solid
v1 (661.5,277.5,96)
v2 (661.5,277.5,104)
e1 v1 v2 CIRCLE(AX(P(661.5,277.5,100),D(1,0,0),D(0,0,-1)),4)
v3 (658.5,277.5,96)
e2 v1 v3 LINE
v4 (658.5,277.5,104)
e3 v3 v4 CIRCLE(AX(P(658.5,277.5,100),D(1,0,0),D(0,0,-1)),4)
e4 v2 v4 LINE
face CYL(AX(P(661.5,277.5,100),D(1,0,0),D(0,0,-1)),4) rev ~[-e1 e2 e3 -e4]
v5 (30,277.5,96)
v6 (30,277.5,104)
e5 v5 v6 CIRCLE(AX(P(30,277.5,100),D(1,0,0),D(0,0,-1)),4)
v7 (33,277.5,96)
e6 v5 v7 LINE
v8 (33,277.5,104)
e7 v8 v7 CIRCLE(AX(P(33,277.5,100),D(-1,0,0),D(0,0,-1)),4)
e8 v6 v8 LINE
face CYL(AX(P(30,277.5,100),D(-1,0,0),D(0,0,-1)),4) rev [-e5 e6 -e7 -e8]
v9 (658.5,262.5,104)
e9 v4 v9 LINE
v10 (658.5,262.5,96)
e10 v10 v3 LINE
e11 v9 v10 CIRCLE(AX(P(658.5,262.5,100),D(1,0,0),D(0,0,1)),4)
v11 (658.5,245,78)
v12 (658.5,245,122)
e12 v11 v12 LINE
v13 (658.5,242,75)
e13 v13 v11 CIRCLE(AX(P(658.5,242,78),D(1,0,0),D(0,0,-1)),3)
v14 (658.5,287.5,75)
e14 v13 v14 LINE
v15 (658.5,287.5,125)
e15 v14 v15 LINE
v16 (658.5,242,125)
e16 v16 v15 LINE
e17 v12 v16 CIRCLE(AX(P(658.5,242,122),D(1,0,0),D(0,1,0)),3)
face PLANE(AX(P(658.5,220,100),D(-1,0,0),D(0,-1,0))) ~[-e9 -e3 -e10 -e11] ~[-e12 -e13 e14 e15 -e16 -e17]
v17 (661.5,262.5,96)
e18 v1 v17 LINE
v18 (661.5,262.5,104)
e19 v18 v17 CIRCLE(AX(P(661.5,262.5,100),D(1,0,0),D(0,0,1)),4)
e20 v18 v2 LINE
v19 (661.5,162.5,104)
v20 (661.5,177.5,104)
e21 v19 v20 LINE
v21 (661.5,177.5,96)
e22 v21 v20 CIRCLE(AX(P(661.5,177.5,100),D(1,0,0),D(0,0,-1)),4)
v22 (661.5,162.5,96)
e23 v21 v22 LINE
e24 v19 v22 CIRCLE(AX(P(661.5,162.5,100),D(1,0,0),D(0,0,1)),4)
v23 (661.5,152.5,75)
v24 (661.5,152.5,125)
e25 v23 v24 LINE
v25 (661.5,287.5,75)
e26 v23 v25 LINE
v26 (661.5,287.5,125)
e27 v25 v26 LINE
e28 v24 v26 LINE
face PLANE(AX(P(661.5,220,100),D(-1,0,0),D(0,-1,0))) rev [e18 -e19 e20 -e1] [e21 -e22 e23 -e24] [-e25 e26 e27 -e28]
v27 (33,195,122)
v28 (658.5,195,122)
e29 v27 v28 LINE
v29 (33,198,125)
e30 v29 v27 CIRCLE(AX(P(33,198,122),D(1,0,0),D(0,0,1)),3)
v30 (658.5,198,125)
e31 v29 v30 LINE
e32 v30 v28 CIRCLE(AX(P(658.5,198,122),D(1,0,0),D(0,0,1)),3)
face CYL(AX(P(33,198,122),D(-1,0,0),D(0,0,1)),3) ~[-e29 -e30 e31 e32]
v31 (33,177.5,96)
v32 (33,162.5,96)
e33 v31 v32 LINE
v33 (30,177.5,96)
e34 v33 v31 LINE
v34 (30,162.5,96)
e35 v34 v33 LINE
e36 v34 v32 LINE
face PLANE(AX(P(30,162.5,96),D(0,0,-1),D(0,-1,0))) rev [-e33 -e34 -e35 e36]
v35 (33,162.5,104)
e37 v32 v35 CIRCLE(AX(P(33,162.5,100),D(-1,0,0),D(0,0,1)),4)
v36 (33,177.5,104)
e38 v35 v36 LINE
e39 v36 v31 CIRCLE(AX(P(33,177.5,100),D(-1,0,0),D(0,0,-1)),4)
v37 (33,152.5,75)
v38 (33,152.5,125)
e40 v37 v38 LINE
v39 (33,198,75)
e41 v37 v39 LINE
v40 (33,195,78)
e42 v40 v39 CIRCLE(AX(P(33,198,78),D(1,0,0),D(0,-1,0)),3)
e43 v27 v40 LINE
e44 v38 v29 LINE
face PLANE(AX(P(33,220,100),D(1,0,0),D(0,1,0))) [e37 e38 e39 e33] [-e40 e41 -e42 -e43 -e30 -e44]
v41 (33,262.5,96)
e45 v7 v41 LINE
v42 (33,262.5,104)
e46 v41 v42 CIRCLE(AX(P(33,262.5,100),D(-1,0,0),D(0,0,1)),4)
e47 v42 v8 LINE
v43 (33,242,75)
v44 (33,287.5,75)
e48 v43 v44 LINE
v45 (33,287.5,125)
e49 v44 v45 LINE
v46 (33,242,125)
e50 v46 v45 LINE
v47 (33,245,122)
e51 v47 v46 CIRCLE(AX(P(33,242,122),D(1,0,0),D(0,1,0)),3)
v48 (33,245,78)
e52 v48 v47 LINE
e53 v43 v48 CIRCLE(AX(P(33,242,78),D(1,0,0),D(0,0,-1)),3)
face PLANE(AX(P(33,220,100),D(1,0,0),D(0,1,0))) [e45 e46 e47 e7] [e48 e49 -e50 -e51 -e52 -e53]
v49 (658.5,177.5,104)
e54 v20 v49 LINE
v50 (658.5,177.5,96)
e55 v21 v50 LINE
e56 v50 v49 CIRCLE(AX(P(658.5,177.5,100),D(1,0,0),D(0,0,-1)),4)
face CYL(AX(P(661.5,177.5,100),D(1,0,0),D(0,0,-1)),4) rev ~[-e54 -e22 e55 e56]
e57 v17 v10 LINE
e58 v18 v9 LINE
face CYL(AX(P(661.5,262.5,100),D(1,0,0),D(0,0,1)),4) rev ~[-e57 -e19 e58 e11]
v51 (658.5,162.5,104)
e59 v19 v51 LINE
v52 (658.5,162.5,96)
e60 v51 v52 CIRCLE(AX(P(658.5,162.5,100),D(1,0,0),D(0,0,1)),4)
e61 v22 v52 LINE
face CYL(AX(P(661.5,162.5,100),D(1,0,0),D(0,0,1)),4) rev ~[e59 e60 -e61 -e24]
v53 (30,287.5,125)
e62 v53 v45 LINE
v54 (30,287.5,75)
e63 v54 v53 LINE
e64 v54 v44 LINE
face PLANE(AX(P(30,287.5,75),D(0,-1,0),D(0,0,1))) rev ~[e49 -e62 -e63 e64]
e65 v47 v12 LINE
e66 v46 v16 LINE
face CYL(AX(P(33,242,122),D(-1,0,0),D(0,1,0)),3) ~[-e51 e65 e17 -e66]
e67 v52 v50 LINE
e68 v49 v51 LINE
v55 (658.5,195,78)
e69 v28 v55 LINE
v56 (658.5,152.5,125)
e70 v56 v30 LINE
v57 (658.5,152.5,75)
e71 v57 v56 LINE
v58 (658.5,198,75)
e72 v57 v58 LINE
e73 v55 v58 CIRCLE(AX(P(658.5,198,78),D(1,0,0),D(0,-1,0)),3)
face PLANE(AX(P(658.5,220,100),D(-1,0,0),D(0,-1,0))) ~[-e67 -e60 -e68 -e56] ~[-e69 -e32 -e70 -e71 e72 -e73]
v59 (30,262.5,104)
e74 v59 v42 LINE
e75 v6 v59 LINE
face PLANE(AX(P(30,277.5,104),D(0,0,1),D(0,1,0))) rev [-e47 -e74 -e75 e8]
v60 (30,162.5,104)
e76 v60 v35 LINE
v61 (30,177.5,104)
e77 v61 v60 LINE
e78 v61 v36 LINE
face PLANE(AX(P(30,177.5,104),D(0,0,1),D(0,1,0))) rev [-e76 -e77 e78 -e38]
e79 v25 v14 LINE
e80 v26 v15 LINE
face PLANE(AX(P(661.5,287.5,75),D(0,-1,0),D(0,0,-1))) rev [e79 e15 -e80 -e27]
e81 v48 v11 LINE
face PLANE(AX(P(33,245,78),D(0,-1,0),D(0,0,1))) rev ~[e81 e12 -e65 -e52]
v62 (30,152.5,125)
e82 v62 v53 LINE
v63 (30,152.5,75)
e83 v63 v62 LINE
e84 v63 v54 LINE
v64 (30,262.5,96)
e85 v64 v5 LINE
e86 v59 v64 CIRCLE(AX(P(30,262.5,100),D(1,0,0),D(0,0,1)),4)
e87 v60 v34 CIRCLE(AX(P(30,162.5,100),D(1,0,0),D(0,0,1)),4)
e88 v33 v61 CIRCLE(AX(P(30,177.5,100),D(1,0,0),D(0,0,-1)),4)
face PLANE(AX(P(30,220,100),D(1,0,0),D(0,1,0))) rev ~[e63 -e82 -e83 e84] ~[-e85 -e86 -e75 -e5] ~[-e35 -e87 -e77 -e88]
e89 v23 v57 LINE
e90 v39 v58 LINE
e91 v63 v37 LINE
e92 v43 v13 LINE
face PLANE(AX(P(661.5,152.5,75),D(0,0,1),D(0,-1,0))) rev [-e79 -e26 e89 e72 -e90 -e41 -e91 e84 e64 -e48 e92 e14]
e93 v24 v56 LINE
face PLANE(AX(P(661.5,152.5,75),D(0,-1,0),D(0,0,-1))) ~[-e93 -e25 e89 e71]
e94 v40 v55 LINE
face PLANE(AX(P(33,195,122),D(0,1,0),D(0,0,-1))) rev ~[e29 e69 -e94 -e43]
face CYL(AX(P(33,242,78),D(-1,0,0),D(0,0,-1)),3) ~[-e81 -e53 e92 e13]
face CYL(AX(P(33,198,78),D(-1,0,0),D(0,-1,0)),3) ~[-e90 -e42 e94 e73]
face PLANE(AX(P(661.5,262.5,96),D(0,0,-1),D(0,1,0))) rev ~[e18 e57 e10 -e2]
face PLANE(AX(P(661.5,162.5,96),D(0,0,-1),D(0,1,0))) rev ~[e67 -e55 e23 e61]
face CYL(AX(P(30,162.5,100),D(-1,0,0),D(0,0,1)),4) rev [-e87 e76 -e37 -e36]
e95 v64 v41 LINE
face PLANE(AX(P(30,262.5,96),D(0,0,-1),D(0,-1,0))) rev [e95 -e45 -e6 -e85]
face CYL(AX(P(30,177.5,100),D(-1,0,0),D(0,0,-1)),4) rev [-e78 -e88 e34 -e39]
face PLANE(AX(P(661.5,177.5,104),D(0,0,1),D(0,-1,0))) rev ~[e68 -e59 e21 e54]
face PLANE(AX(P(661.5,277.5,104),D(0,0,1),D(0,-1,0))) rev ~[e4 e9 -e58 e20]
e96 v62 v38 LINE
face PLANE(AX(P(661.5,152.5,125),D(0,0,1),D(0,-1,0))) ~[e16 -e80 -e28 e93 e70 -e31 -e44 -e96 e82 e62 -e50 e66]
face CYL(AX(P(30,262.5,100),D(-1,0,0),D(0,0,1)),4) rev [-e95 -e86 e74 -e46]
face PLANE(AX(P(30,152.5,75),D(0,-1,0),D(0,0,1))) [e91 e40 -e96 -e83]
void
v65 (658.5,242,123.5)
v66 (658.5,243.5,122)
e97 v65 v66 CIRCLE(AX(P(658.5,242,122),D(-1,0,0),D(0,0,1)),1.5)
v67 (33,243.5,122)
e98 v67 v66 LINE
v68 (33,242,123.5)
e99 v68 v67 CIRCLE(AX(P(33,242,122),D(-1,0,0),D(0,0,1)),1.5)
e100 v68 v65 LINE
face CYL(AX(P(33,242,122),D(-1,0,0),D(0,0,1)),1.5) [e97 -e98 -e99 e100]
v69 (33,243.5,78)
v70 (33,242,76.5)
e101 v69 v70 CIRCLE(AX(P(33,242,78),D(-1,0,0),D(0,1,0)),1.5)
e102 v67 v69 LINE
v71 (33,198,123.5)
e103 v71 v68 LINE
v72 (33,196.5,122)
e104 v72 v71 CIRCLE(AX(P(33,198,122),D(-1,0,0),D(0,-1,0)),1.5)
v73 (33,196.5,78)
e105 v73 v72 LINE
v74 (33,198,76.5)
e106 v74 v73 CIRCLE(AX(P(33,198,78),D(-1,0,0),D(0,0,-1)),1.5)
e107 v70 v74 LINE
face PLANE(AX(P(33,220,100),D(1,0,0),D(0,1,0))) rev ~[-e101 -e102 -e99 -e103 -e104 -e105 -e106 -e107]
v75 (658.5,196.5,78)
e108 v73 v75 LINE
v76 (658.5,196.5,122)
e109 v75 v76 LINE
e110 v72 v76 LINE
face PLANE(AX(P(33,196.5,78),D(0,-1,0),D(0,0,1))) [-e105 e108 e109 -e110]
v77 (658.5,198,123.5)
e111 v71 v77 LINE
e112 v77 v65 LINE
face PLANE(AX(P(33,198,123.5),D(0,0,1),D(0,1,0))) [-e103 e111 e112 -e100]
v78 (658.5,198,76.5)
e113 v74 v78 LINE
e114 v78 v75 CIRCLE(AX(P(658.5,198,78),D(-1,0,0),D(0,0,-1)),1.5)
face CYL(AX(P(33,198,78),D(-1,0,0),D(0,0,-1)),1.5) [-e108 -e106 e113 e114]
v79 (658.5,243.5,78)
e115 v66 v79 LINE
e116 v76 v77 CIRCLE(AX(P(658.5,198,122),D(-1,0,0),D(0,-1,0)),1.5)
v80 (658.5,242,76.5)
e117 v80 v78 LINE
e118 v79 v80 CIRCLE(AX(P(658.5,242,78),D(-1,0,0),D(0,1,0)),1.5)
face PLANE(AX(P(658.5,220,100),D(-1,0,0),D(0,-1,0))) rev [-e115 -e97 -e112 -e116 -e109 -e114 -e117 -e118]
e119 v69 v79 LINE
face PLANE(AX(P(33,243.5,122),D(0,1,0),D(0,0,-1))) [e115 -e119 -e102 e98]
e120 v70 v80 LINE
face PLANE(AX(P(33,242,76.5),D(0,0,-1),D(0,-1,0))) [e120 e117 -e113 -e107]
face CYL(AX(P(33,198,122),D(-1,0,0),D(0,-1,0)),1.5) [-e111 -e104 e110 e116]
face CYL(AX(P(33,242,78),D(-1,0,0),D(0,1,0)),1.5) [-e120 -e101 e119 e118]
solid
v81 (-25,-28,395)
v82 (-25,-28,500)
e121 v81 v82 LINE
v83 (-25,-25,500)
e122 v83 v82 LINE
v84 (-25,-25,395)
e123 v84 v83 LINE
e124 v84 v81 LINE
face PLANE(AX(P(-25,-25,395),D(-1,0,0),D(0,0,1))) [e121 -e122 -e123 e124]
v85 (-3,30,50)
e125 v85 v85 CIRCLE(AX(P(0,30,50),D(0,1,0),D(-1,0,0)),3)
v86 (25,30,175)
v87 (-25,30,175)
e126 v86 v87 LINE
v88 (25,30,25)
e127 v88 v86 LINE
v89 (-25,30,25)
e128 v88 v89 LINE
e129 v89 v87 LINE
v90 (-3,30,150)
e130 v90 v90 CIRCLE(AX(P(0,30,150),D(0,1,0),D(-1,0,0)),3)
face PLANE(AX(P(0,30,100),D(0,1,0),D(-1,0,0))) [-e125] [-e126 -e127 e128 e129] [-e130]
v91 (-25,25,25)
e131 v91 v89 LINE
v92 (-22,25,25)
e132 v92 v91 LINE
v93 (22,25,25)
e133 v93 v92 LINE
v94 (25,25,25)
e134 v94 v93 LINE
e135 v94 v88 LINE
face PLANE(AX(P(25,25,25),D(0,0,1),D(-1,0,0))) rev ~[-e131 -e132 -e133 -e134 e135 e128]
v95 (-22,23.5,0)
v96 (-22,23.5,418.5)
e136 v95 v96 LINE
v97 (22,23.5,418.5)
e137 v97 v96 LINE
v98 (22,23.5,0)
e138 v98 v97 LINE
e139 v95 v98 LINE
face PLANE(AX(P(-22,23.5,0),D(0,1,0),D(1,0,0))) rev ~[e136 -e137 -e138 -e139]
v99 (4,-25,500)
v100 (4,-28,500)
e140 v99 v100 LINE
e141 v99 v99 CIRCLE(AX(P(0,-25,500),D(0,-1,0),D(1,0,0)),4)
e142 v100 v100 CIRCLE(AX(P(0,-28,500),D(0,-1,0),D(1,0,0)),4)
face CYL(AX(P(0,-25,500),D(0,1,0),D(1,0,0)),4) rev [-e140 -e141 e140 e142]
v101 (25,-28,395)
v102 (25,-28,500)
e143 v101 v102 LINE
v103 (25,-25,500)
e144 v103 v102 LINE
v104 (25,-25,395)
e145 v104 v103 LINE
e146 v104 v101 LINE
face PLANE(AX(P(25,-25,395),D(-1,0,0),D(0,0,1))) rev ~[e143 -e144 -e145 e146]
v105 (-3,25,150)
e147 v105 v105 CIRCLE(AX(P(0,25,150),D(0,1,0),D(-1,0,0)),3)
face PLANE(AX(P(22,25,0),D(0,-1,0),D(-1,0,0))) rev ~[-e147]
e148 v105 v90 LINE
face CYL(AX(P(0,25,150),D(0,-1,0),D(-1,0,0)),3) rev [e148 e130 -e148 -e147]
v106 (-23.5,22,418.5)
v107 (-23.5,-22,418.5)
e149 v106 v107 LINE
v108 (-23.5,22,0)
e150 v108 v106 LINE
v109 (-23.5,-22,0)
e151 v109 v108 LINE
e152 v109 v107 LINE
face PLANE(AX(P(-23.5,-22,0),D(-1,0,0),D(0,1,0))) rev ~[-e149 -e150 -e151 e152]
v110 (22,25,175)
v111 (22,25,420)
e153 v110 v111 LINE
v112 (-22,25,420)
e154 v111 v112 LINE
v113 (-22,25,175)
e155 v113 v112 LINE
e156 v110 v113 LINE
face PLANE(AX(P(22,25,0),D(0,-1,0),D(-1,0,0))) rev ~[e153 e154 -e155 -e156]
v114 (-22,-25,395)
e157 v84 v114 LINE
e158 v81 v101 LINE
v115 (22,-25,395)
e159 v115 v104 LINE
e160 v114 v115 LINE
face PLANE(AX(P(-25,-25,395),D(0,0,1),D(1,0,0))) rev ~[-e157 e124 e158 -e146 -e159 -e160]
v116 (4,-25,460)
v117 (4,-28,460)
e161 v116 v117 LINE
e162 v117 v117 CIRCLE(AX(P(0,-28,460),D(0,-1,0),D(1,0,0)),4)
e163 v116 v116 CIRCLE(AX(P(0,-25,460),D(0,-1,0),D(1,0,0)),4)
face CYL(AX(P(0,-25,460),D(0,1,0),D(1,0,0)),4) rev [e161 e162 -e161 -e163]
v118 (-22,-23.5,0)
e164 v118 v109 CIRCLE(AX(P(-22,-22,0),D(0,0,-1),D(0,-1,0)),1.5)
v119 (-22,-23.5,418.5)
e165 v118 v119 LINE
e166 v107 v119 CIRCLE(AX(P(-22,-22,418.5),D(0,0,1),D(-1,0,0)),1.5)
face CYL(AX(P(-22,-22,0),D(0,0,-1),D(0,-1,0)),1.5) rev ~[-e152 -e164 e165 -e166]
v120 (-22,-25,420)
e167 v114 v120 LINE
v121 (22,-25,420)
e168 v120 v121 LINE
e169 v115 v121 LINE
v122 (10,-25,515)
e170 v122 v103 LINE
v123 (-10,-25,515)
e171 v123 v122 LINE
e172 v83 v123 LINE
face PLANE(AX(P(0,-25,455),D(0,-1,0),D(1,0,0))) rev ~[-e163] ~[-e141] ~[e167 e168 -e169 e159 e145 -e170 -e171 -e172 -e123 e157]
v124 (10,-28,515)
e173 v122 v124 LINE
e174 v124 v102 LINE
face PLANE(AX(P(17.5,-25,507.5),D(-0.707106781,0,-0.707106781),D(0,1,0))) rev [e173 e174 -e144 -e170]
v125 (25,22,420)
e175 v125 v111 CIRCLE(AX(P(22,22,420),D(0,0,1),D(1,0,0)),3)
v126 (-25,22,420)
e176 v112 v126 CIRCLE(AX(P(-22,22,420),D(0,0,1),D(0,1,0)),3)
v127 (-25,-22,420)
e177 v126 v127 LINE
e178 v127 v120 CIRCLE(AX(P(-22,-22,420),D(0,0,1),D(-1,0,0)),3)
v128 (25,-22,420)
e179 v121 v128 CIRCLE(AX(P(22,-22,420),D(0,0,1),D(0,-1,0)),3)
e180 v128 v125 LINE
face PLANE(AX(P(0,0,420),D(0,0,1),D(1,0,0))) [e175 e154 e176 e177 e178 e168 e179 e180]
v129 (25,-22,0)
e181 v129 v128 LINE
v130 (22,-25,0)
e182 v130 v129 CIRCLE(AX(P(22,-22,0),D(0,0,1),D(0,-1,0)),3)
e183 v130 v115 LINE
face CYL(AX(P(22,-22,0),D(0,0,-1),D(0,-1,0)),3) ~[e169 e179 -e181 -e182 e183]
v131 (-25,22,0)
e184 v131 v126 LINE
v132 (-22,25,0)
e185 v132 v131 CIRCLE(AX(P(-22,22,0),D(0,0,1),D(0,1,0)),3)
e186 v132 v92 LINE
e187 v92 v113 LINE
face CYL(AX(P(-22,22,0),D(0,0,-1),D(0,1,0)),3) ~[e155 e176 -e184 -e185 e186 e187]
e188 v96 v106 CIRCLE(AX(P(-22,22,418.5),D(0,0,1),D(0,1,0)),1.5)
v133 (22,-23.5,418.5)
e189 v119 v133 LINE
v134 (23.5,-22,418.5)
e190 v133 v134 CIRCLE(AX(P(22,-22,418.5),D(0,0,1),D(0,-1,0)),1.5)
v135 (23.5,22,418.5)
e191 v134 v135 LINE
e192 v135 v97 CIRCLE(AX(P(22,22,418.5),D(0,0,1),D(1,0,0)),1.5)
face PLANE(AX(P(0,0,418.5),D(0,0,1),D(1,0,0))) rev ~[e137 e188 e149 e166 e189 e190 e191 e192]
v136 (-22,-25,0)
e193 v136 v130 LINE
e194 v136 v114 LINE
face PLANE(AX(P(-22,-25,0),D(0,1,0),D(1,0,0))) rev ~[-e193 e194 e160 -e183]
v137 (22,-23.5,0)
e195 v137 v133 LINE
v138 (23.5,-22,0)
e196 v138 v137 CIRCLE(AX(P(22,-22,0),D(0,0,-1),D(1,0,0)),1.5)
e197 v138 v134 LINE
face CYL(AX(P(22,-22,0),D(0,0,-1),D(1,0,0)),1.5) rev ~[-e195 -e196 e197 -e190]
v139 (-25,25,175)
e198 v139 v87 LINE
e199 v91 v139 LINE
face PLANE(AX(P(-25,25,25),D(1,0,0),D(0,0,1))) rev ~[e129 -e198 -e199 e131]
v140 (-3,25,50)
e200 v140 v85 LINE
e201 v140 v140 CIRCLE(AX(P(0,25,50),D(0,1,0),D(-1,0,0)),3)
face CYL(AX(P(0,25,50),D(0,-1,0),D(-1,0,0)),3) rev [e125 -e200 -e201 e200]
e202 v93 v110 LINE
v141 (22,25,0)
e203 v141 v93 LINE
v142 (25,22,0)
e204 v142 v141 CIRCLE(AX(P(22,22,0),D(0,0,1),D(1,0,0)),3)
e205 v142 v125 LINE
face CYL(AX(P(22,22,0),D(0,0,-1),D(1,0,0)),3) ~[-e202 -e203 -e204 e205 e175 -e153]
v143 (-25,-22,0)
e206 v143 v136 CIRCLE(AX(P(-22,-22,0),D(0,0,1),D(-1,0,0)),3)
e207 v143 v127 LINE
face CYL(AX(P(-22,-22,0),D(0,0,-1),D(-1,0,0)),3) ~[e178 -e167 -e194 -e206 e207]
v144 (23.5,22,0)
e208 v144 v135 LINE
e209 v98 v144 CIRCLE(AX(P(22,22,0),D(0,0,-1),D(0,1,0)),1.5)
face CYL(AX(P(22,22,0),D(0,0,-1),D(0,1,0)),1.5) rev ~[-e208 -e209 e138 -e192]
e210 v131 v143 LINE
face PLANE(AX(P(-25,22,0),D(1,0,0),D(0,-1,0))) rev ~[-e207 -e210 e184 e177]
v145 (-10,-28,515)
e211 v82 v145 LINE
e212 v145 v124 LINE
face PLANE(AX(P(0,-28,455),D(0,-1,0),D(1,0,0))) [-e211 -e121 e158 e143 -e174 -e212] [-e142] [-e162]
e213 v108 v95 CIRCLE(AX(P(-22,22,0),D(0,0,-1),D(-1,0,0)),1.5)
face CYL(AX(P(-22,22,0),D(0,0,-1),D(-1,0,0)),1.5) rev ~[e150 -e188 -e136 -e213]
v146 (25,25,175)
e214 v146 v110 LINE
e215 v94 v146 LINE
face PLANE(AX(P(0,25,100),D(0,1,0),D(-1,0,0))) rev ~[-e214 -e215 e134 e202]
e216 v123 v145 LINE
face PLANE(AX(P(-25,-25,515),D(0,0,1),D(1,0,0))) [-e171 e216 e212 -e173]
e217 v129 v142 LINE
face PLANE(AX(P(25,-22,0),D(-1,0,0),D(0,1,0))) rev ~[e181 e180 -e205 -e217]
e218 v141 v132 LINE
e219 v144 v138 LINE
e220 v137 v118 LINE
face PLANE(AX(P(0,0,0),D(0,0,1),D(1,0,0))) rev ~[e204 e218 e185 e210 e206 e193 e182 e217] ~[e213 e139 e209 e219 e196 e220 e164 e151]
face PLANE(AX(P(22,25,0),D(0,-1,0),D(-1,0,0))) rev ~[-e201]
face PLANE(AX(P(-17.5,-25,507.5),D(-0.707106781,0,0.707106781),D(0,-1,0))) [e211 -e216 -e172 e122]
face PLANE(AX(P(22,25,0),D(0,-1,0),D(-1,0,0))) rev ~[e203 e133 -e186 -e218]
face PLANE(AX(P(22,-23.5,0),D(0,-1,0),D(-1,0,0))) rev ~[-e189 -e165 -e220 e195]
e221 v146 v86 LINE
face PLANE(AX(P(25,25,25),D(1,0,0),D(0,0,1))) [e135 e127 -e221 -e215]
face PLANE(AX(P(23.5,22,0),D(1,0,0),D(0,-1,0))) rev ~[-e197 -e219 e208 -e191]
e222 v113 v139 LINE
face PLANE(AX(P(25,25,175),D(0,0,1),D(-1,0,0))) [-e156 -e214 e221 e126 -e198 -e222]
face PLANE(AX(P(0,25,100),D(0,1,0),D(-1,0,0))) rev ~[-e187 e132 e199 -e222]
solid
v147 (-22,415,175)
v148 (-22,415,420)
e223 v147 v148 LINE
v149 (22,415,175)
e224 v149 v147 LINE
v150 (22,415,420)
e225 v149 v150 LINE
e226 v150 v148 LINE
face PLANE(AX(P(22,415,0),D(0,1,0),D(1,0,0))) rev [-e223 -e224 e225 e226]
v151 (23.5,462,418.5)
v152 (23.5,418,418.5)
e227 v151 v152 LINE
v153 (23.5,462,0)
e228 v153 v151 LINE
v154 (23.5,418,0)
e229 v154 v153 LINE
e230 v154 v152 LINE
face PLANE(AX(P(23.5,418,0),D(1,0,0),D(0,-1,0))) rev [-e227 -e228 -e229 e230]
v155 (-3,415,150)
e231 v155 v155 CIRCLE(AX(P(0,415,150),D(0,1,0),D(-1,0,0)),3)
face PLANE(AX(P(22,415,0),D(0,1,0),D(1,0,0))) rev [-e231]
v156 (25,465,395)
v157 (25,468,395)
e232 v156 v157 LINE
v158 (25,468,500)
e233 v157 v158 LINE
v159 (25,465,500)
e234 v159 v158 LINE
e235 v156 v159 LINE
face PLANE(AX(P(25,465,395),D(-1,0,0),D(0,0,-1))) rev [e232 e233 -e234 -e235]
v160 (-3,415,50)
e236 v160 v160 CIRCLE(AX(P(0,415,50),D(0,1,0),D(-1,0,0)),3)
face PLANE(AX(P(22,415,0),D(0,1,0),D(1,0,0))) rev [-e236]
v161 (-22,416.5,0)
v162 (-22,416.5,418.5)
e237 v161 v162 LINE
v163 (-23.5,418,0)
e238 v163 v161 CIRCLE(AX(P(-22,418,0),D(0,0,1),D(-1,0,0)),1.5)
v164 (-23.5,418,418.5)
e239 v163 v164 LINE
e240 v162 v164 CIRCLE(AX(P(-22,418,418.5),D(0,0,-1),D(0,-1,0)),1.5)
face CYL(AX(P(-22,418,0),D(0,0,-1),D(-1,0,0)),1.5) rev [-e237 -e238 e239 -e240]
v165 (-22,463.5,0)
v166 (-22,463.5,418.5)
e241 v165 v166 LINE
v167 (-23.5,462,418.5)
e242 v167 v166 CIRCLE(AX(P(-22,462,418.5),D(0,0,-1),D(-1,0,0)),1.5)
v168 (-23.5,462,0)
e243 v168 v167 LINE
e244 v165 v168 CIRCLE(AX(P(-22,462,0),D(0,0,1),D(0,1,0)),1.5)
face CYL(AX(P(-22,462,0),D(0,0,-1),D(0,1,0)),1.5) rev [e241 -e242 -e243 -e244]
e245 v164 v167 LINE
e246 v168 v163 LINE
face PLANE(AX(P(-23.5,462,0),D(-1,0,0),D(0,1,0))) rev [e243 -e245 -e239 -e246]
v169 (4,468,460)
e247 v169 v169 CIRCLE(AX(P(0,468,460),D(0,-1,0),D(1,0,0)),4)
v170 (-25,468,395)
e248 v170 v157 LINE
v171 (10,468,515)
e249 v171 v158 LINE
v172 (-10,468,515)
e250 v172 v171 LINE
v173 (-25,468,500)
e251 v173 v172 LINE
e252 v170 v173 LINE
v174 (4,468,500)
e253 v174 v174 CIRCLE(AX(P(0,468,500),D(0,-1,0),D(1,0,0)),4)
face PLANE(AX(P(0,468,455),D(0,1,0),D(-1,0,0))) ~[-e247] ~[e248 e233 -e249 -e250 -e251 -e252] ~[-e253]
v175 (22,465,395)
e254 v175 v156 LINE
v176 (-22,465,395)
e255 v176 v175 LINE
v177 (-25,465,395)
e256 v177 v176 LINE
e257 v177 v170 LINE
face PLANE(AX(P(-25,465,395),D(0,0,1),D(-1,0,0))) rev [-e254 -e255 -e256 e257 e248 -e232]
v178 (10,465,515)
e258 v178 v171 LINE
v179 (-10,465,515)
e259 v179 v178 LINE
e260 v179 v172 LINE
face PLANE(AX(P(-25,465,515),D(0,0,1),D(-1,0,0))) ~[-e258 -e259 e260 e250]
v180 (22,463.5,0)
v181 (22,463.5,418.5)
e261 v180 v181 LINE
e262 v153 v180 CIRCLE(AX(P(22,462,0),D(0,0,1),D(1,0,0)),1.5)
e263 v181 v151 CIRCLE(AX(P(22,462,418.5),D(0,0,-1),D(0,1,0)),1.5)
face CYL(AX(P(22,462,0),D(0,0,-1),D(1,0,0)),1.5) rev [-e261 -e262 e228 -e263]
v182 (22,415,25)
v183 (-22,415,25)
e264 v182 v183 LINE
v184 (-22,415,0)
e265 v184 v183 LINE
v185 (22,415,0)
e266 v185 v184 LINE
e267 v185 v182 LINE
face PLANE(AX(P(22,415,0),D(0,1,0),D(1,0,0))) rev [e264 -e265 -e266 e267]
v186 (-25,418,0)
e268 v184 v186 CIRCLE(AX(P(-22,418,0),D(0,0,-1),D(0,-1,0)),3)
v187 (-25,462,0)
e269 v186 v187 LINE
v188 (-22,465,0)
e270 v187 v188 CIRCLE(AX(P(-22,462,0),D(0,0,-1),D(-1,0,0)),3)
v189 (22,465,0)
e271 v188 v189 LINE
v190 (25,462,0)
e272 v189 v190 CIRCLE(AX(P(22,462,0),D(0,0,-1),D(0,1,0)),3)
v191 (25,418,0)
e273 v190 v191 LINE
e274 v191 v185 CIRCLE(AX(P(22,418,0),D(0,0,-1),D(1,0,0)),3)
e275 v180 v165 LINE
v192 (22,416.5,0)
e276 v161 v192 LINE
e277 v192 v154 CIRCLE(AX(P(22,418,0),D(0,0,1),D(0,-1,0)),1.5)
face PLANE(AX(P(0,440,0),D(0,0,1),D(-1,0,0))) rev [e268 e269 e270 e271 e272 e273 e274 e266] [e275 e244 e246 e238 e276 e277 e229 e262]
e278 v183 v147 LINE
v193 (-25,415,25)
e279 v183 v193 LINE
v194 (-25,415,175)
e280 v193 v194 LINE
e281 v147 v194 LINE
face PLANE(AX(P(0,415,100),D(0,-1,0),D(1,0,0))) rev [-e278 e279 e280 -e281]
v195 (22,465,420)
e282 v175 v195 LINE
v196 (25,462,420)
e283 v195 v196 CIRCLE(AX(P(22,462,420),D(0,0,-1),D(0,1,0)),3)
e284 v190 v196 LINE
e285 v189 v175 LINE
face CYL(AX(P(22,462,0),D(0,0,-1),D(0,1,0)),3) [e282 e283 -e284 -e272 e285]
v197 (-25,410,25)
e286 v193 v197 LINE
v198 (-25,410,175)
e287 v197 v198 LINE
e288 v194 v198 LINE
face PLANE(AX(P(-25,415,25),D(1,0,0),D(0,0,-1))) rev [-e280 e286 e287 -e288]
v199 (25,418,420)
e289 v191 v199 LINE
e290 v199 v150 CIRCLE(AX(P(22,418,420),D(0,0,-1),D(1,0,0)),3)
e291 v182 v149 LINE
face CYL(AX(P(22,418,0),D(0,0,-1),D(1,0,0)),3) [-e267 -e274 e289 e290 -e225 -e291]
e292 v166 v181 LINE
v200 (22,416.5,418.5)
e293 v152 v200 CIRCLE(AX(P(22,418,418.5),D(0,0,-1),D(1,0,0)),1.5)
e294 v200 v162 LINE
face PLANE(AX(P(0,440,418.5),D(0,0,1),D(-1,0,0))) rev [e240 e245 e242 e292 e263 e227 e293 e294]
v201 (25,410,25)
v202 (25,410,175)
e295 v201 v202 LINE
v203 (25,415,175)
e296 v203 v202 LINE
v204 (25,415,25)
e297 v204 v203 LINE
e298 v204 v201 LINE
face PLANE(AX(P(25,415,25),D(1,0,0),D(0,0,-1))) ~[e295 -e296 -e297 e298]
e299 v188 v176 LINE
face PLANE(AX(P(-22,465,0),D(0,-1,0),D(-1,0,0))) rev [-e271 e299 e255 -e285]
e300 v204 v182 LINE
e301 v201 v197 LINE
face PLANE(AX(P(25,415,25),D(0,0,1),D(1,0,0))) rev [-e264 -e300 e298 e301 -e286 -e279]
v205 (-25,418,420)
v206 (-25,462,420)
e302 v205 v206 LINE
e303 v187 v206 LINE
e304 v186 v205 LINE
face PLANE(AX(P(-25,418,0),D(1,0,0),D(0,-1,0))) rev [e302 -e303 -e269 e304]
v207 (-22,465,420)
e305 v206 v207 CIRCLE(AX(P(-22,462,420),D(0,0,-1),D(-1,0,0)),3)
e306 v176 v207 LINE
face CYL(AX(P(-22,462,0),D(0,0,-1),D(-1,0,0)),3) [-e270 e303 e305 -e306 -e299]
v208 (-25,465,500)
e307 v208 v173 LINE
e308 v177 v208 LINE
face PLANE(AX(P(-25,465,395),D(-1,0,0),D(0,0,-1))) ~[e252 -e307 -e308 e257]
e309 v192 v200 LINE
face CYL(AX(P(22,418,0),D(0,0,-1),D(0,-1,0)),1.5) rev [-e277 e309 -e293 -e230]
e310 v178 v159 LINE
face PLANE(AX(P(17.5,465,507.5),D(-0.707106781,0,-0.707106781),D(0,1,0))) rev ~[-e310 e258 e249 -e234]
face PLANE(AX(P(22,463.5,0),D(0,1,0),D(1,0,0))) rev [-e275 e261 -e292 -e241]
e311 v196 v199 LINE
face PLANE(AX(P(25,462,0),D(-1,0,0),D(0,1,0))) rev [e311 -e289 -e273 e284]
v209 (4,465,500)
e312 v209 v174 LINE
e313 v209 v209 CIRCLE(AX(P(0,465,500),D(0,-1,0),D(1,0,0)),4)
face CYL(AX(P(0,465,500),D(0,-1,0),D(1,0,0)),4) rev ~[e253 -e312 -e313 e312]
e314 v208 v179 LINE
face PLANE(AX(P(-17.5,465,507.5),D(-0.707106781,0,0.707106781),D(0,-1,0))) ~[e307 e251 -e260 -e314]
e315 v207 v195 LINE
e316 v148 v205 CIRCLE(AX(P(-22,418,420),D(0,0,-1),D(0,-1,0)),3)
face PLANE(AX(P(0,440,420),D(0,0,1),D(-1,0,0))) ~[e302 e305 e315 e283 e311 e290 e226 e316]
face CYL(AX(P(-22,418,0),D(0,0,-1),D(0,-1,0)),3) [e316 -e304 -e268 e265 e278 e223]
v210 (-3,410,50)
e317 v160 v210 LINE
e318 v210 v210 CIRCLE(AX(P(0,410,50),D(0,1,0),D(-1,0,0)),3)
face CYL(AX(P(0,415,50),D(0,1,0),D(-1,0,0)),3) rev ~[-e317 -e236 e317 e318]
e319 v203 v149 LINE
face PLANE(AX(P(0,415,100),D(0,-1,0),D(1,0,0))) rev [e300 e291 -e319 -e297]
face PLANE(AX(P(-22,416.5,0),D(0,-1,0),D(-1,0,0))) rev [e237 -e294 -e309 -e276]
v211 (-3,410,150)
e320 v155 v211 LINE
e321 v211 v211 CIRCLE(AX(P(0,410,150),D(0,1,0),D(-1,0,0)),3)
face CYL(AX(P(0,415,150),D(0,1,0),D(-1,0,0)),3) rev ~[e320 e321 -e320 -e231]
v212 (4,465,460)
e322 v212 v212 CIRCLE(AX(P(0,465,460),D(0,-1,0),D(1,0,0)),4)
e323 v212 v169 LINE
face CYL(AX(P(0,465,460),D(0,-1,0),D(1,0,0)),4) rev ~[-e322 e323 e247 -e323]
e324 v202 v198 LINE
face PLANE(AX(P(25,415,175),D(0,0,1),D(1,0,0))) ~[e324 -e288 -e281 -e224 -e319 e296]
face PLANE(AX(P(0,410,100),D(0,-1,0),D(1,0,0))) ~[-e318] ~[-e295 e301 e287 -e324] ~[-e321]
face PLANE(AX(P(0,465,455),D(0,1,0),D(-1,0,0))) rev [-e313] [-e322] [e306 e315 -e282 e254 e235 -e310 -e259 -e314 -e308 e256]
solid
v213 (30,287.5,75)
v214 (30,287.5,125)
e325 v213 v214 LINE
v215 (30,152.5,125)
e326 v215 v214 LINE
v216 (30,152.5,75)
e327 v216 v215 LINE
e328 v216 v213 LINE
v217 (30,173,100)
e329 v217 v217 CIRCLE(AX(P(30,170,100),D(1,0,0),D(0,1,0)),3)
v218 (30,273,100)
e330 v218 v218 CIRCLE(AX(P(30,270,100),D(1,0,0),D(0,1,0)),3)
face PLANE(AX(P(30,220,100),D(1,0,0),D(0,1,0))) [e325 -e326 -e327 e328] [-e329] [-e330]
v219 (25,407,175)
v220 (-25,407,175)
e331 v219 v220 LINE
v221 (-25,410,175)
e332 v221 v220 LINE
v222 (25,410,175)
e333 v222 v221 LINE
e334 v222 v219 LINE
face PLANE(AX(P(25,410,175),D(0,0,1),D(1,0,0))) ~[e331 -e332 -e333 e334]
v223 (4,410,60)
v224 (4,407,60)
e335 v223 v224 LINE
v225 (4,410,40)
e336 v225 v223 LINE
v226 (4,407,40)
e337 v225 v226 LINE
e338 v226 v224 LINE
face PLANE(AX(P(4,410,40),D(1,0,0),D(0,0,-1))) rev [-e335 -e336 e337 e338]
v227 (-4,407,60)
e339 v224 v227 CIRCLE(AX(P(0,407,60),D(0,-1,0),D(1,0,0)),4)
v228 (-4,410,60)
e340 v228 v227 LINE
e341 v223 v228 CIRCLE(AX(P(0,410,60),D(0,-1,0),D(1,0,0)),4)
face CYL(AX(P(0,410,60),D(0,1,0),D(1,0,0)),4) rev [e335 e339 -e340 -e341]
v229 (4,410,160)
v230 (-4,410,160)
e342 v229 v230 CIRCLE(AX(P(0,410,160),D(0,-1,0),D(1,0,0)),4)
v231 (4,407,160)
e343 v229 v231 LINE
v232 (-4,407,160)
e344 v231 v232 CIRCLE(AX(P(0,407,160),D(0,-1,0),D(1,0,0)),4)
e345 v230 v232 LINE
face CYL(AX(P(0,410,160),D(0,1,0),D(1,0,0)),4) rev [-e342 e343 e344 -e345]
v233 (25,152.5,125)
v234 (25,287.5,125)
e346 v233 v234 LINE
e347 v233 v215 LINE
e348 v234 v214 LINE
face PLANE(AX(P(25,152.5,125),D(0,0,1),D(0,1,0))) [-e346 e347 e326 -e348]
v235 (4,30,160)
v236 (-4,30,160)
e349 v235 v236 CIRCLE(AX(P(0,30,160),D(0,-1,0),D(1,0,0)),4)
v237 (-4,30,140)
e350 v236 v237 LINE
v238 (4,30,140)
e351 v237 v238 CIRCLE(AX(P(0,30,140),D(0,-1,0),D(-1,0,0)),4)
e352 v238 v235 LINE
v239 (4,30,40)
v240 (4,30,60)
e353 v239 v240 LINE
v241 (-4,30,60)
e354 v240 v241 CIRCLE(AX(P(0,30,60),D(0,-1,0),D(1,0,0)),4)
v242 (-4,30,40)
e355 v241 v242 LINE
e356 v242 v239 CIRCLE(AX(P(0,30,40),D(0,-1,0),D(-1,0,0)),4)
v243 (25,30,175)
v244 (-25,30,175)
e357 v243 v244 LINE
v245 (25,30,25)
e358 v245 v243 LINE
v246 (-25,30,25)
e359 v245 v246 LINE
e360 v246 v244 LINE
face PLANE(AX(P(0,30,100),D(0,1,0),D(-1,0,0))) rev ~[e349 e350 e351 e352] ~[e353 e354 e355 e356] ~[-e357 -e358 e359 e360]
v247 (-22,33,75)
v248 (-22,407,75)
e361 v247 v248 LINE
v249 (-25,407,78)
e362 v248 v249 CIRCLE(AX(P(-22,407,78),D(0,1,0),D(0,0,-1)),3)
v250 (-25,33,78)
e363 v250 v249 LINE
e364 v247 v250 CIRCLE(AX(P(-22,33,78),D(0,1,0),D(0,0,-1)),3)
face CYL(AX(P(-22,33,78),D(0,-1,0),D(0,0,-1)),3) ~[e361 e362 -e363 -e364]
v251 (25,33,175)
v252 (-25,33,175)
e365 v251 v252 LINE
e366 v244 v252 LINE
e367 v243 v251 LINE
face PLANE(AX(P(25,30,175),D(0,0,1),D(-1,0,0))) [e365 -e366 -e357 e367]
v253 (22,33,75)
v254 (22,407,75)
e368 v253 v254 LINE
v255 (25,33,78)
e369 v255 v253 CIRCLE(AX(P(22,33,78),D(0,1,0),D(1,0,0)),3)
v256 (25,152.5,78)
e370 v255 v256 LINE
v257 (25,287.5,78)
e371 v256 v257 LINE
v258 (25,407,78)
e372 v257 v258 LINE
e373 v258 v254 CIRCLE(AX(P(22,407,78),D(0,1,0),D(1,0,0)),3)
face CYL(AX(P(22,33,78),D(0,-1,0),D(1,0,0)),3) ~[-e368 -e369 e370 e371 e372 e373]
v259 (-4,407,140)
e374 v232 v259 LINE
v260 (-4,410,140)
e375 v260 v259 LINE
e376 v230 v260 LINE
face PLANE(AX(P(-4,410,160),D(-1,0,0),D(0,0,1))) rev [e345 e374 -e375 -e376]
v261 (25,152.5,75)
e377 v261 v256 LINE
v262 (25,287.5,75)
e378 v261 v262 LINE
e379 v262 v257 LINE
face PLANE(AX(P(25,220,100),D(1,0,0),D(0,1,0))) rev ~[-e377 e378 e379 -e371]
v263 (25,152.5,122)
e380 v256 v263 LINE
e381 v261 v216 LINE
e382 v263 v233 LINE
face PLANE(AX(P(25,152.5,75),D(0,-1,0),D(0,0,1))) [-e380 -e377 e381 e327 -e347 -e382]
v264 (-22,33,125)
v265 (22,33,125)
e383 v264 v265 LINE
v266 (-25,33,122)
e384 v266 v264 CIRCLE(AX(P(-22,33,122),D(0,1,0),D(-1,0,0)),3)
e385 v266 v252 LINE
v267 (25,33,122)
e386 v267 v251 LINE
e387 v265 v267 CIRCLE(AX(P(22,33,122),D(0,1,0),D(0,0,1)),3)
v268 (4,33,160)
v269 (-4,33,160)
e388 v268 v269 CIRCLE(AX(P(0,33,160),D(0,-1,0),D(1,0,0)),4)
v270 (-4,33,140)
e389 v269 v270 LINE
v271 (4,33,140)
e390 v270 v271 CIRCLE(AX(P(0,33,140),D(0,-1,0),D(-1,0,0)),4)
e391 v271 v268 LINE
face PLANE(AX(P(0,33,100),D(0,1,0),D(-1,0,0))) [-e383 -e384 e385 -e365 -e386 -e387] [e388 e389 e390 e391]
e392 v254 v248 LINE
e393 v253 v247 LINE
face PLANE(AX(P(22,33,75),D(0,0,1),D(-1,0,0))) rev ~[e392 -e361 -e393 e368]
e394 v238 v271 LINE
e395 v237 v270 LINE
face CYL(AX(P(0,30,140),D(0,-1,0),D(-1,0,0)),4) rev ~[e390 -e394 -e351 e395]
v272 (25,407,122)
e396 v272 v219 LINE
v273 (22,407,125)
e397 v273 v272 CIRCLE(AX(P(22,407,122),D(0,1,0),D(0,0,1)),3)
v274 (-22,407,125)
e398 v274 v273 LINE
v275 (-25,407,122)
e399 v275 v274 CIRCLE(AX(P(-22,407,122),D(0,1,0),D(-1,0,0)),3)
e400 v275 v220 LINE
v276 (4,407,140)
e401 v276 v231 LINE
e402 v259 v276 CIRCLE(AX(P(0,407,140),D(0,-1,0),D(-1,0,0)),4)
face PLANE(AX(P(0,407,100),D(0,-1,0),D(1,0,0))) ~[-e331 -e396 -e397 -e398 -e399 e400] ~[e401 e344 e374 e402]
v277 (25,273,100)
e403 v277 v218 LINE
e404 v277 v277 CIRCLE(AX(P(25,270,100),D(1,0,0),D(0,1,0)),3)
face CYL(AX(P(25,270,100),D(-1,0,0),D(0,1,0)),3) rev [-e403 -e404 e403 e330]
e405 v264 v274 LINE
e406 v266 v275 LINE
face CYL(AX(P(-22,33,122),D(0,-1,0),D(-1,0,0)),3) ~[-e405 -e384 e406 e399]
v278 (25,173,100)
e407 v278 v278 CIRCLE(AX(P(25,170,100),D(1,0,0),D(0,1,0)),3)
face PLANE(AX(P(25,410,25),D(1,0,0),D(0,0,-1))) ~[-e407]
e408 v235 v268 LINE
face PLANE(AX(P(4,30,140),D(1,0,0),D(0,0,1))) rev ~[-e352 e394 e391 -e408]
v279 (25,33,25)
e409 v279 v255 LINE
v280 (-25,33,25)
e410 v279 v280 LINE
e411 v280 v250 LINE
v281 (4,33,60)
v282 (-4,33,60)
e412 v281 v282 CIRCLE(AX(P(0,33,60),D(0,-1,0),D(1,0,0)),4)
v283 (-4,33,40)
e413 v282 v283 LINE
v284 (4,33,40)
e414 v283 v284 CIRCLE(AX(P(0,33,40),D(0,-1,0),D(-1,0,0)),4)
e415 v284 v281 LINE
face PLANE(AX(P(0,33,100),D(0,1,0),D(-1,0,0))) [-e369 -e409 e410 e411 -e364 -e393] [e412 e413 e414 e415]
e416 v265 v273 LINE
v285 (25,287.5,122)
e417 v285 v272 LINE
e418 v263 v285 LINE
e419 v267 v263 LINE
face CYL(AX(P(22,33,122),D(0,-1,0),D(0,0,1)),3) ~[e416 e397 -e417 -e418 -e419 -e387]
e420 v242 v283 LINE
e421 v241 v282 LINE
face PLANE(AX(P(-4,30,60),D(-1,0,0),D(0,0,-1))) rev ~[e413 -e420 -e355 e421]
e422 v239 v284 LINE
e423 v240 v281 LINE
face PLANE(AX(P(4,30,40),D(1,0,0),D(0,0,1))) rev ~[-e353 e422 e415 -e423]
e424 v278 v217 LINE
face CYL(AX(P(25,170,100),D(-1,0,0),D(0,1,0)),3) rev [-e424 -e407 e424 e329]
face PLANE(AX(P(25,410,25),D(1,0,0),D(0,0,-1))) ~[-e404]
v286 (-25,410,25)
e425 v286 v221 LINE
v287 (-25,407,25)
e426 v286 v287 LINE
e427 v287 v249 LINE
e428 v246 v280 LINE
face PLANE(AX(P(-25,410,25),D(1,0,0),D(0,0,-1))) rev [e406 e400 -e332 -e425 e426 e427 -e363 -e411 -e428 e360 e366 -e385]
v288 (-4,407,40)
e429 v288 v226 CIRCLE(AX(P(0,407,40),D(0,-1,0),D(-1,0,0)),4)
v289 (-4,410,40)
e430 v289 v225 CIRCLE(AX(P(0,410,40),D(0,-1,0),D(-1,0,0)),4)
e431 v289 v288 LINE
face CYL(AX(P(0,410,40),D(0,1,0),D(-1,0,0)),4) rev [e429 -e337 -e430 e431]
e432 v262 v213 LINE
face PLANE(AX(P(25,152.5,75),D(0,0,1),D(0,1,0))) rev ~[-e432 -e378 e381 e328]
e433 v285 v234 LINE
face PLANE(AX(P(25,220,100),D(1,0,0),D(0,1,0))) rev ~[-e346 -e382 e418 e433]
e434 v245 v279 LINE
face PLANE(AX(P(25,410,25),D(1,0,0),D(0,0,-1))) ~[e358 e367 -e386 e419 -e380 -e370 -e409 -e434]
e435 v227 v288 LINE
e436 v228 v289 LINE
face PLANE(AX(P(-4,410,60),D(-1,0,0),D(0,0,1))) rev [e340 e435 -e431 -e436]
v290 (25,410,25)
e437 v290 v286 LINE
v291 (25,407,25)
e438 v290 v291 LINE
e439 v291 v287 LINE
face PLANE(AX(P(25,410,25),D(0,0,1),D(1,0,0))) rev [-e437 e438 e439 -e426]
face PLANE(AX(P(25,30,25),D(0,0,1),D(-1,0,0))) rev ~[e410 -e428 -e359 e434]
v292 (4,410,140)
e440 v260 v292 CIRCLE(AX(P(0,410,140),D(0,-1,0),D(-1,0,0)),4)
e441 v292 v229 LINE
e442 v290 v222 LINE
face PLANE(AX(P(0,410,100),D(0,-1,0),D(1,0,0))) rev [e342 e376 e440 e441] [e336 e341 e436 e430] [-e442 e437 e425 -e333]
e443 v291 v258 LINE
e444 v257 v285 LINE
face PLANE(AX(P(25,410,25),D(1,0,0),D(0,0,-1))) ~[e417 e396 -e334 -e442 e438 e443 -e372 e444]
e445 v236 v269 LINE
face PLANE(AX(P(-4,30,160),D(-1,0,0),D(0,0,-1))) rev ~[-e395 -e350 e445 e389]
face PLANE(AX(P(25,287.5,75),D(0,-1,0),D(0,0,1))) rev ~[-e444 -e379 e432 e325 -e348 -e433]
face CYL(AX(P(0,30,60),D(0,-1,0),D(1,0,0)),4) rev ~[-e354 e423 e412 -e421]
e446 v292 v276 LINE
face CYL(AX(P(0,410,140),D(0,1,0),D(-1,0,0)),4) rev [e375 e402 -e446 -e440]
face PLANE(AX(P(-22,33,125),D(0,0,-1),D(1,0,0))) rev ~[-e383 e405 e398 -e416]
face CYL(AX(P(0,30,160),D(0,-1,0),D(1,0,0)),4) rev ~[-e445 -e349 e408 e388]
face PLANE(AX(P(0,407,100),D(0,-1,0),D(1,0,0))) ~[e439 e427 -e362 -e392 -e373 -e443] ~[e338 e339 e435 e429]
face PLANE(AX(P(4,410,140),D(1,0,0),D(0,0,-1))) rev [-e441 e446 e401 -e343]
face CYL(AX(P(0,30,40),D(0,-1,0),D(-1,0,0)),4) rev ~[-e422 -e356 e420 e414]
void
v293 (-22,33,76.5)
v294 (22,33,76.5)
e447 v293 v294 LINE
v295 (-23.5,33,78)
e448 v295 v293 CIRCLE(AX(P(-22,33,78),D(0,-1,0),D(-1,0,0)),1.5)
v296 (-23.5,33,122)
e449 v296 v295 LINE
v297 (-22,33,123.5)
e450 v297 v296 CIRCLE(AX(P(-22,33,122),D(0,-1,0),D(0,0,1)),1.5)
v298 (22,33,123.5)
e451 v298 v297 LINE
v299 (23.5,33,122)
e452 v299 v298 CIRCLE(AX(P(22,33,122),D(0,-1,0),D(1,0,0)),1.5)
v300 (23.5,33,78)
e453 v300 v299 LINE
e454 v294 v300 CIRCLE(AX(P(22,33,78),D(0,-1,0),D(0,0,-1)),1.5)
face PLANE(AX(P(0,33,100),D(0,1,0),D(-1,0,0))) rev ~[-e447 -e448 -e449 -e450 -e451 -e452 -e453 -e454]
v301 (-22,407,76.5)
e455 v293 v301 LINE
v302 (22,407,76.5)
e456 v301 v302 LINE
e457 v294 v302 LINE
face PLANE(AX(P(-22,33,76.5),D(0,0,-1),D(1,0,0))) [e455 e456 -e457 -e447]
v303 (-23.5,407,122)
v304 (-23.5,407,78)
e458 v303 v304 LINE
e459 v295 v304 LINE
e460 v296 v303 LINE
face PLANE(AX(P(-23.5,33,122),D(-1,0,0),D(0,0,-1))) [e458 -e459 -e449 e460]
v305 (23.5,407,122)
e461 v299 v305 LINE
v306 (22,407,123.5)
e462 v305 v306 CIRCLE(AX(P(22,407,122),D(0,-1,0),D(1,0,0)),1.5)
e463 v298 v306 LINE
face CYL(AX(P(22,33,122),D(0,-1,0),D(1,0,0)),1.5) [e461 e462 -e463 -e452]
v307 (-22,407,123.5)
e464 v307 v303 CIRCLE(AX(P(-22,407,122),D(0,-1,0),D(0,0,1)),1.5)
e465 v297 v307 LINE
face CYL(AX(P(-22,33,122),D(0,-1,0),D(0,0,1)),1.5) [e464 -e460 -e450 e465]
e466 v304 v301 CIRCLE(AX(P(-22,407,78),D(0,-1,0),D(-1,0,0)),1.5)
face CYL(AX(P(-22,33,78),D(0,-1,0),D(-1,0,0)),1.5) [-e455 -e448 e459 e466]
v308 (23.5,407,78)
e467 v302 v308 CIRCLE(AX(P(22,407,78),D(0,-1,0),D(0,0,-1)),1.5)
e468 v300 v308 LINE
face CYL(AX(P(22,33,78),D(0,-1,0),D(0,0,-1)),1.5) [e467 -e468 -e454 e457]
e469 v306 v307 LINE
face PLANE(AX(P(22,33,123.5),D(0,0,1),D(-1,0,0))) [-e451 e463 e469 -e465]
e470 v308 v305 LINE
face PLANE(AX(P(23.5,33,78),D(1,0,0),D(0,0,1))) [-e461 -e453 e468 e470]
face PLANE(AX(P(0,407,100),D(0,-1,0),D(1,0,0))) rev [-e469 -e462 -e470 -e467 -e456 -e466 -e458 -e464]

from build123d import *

# Parameters (mm, degrees)
F1_DEPTH  = 420
F2_W      = 50
F2_H      = 150
F2_R      = 3
F3_DEPTH  = 5
F5_DEPTH  = 1.5
F6_W      = 50
F6_H      = 120
F6_R      = 4
F7_DEPTH  = 3
F8_SIZE   = 15
F11_W     = 50
F11_H     = 150
F12_DEPTH = 3
F15_DEPTH = 374
F17_W     = 135
F17_H     = 50
F17_R     = 3
F18_DEPTH = 5
F19_W     = 135
F19_H     = 50
F19_R     = 4
F20_DEPTH = 3
F23_DEPTH = 625.5
F25_DEPTH = 3.001


# Not quite as in the source:
# - a pattern or mirror of a feature is missing from the dataset's text; its kind, count and spacing are read off the source's solid


with BuildPart() as f1:
    # F0 (on Top) → F1 (new body)
    with BuildSketch(Plane.XY):
        with BuildLine():
            Line((-22, -25), (22, -25))
            ThreePointArc((22, -25), (24.1213203436, -24.1213203436), (25, -22))
            Line((25, -22), (25, 22))
            ThreePointArc((25, 22), (24.1213203436, 24.1213203436), (22, 25))
            Line((22, 25), (-22, 25))
            ThreePointArc((-22, 25), (-24.1213203436, 24.1213203436), (-25, 22))
            Line((-25, 22), (-25, -22))
            ThreePointArc((-25, -22), (-24.1213203436, -24.1213203436), (-22, -25))
        make_face()
        with BuildLine():
            ThreePointArc((22, 23.5), (23.0606601718, 23.0606601718), (23.5, 22))
            Line((23.5, 22), (23.5, -22))
            ThreePointArc((23.5, -22), (23.0606601718, -23.0606601718), (22, -23.5))
            Line((22, -23.5), (-22, -23.5))
            ThreePointArc((-22, -23.5), (-23.0606601718, -23.0606601718), (-23.5, -22))
            Line((-23.5, -22), (-23.5, 22))
            ThreePointArc((-23.5, 22), (-23.0606601718, 23.0606601718), (-22, 23.5))
            Line((-22, 23.5), (22, 23.5))
        make_face(mode=Mode.SUBTRACT)
    extrude(amount=F1_DEPTH)

    # F2 (on face) → F3 (join)
    with BuildSketch(Plane(origin=(0, 25, 0), x_dir=(-1, 0, 0), z_dir=(0, 1, 0))):
        with Locations((0, 100)):
            Rectangle(F2_W, F2_H)
        with Locations((0, 50)):
            Circle(F2_R, mode=Mode.SUBTRACT)
        with Locations((0, 150)):
            Circle(F2_R, mode=Mode.SUBTRACT)
    extrude(amount=F3_DEPTH)

    # F4 (on face) → F5 (join)
    with BuildSketch(Plane.XY.offset(420)):
        with BuildLine():
            ThreePointArc((23.5, 22), (23.0606601718, 23.0606601718), (22, 23.5))
            Line((22, 23.5), (-22, 23.5))
            ThreePointArc((-22, 23.5), (-23.0606601718, 23.0606601718), (-23.5, 22))
            Line((-23.5, 22), (-23.5, -22))
            ThreePointArc((-23.5, -22), (-23.0606601718, -23.0606601718), (-22, -23.5))
            Line((-22, -23.5), (22, -23.5))
            ThreePointArc((22, -23.5), (23.0606601718, -23.0606601718), (23.5, -22))
            Line((23.5, -22), (23.5, 22))
        make_face()
    extrude(amount=-F5_DEPTH)

    # F6 (on face) → F7 (join)
    with BuildSketch(Plane.XZ.offset(25)):
        with Locations((0, 455)):
            Rectangle(F6_W, F6_H)
        with Locations((0, 460)):
            Circle(F6_R, mode=Mode.SUBTRACT)
        with Locations((0, 500)):
            Circle(F6_R, mode=Mode.SUBTRACT)
    extrude(amount=F7_DEPTH)

    # F8
    f8_edges = [f1.edges().sort_by_distance(p)[0] for p in [
        (25, -26.5, 515),
        (-25, -26.5, 515),
    ]]
    chamfer(f8_edges, length=F8_SIZE)


with BuildPart() as f10_1:
    # F10: instance of F1
    add(f1.part.mirror(Plane(origin=(0, 220, 463.1674453561), x_dir=(1, 0, 0), z_dir=(0, 1, 0))))


with BuildPart() as f12:
    # F11 (on face) → F12 (new body)
    with BuildSketch(Plane(origin=(0, 30, 0), x_dir=(-1, 0, 0), z_dir=(0, 1, 0))):
        with Locations((0, 100)):
            Rectangle(F11_W, F11_H)
        with BuildLine():
            Line((-4, 40), (-4, 60))
            ThreePointArc((-4, 60), (0, 64), (4, 60))
            Line((4, 60), (4, 40))
            ThreePointArc((4, 40), (0, 36), (-4, 40))
        make_face(mode=Mode.SUBTRACT)
        with BuildLine():
            Line((4, 160), (4, 140))
            ThreePointArc((4, 140), (0, 136), (-4, 140))
            Line((-4, 140), (-4, 160))
            ThreePointArc((-4, 160), (0, 164), (4, 160))
        make_face(mode=Mode.SUBTRACT)
    extrude(amount=F12_DEPTH)


with BuildPart() as f13_1:
    # F13: instance of F12
    add(f12.part.mirror(Plane(origin=(0, 220, 463.1674453561), x_dir=(1, 0, 0), z_dir=(0, 1, 0))))


with BuildPart() as f12_1:
    add(f12.part)

    add(f13_1.part)  # F15 merges F13_1
    # F14 (on face) → F15 (join, through all)
    with BuildSketch(Plane(origin=(0, 33, 0), x_dir=(-1, 0, 0), z_dir=(0, 1, 0))):
        with BuildLine():
            Line((-22, 75), (22, 75))
            ThreePointArc((22, 75), (24.1213203436, 75.8786796564), (25, 78))
            Line((25, 78), (25, 122))
            ThreePointArc((25, 122), (24.1213203436, 124.1213203436), (22, 125))
            Line((22, 125), (-22, 125))
            ThreePointArc((-22, 125), (-24.1213203436, 124.1213203436), (-25, 122))
            Line((-25, 122), (-25, 78))
            ThreePointArc((-25, 78), (-24.1213203436, 75.8786796564), (-22, 75))
        make_face()
        with BuildLine():
            ThreePointArc((22, 123.5), (23.0606601718, 123.0606601718), (23.5, 122))
            Line((23.5, 122), (23.5, 78))
            ThreePointArc((23.5, 78), (23.0606601718, 76.9393398282), (22, 76.5))
            Line((22, 76.5), (-22, 76.5))
            ThreePointArc((-22, 76.5), (-23.0606601718, 76.9393398282), (-23.5, 78))
            Line((-23.5, 78), (-23.5, 122))
            ThreePointArc((-23.5, 122), (-23.0606601718, 123.0606601718), (-22, 123.5))
            Line((-22, 123.5), (22, 123.5))
        make_face(mode=Mode.SUBTRACT)
    extrude(amount=F15_DEPTH)

    # F17 (on face) → F18 (join)
    with BuildSketch(Plane.YZ.offset(25)):
        with Locations((220, 100)):
            Rectangle(F17_W, F17_H)
        with Locations((170, 100)):
            Circle(F17_R, mode=Mode.SUBTRACT)
        with Locations((270, 100)):
            Circle(F17_R, mode=Mode.SUBTRACT)
    extrude(amount=F18_DEPTH)


with BuildPart() as f20:
    # F19 (on face) → F20 (new body)
    with BuildSketch(Plane.YZ.offset(30)):
        with Locations((220, 100)):
            Rectangle(F19_W, F19_H)
        with Locations((170, 100)):
            Circle(F19_R, mode=Mode.SUBTRACT)
        with Locations((270, 100)):
            Circle(F19_R, mode=Mode.SUBTRACT)
    extrude(amount=F20_DEPTH)


with BuildPart() as f21_1:
    # F21: instance of F20
    add(f20.part.mirror(Plane(origin=(345.75, 0, 210), x_dir=(0, 1, 0), z_dir=(1, 0, 0))))


with BuildPart() as f20_1:
    add(f20.part)

    add(f21_1.part)  # F23 merges F21_1
    # F22 (on face) → F23 (join, through all)
    with BuildSketch(Plane.YZ.offset(33)):
        with BuildLine():
            Line((198, 75), (242, 75))
            ThreePointArc((242, 75), (244.1213203436, 75.8786796564), (245, 78))
            Line((245, 78), (245, 122))
            ThreePointArc((245, 122), (244.1213203436, 124.1213203436), (242, 125))
            Line((242, 125), (198, 125))
            ThreePointArc((198, 125), (195.8786796564, 124.1213203436), (195, 122))
            Line((195, 122), (195, 78))
            ThreePointArc((195, 78), (195.8786796564, 75.8786796564), (198, 75))
        make_face()
        with BuildLine():
            ThreePointArc((242, 123.5), (243.0606601718, 123.0606601718), (243.5, 122))
            Line((243.5, 122), (243.5, 78))
            ThreePointArc((243.5, 78), (243.0606601718, 76.9393398282), (242, 76.5))
            Line((242, 76.5), (198, 76.5))
            ThreePointArc((198, 76.5), (196.9393398282, 76.9393398282), (196.5, 78))
            Line((196.5, 78), (196.5, 122))
            ThreePointArc((196.5, 122), (196.9393398282, 123.0606601718), (198, 123.5))
            Line((198, 123.5), (242, 123.5))
        make_face(mode=Mode.SUBTRACT)
    extrude(amount=F23_DEPTH)

    # F24 (on face) → F25 (cut, through all)
    with BuildSketch(Plane.YZ.offset(661.5)):
        with BuildLine():
            Line((162.5, 96), (177.5, 96))
            ThreePointArc((177.5, 96), (181.5, 100), (177.5, 104))
            Line((177.5, 104), (162.5, 104))
            ThreePointArc((162.5, 104), (158.5, 100), (162.5, 96))
        make_face()
        with BuildLine():
            ThreePointArc((262.5, 104), (258.5, 100), (262.5, 96))
            Line((262.5, 96), (277.5, 96))
            ThreePointArc((277.5, 96), (281.5, 100), (277.5, 104))
            Line((277.5, 104), (262.5, 104))
        make_face()
    f25 = extrude(amount=-F25_DEPTH, mode=Mode.SUBTRACT)

    # F25_copies: F25 across plane
    add(f25.mirror(Plane(origin=(345.75, 0, 0), x_dir=(0, 0, -1), z_dir=(-1, 0, 0))), mode=Mode.SUBTRACT)


solid = Compound([f1.part, f10_1.part, f12_1.part, f20_1.part])
